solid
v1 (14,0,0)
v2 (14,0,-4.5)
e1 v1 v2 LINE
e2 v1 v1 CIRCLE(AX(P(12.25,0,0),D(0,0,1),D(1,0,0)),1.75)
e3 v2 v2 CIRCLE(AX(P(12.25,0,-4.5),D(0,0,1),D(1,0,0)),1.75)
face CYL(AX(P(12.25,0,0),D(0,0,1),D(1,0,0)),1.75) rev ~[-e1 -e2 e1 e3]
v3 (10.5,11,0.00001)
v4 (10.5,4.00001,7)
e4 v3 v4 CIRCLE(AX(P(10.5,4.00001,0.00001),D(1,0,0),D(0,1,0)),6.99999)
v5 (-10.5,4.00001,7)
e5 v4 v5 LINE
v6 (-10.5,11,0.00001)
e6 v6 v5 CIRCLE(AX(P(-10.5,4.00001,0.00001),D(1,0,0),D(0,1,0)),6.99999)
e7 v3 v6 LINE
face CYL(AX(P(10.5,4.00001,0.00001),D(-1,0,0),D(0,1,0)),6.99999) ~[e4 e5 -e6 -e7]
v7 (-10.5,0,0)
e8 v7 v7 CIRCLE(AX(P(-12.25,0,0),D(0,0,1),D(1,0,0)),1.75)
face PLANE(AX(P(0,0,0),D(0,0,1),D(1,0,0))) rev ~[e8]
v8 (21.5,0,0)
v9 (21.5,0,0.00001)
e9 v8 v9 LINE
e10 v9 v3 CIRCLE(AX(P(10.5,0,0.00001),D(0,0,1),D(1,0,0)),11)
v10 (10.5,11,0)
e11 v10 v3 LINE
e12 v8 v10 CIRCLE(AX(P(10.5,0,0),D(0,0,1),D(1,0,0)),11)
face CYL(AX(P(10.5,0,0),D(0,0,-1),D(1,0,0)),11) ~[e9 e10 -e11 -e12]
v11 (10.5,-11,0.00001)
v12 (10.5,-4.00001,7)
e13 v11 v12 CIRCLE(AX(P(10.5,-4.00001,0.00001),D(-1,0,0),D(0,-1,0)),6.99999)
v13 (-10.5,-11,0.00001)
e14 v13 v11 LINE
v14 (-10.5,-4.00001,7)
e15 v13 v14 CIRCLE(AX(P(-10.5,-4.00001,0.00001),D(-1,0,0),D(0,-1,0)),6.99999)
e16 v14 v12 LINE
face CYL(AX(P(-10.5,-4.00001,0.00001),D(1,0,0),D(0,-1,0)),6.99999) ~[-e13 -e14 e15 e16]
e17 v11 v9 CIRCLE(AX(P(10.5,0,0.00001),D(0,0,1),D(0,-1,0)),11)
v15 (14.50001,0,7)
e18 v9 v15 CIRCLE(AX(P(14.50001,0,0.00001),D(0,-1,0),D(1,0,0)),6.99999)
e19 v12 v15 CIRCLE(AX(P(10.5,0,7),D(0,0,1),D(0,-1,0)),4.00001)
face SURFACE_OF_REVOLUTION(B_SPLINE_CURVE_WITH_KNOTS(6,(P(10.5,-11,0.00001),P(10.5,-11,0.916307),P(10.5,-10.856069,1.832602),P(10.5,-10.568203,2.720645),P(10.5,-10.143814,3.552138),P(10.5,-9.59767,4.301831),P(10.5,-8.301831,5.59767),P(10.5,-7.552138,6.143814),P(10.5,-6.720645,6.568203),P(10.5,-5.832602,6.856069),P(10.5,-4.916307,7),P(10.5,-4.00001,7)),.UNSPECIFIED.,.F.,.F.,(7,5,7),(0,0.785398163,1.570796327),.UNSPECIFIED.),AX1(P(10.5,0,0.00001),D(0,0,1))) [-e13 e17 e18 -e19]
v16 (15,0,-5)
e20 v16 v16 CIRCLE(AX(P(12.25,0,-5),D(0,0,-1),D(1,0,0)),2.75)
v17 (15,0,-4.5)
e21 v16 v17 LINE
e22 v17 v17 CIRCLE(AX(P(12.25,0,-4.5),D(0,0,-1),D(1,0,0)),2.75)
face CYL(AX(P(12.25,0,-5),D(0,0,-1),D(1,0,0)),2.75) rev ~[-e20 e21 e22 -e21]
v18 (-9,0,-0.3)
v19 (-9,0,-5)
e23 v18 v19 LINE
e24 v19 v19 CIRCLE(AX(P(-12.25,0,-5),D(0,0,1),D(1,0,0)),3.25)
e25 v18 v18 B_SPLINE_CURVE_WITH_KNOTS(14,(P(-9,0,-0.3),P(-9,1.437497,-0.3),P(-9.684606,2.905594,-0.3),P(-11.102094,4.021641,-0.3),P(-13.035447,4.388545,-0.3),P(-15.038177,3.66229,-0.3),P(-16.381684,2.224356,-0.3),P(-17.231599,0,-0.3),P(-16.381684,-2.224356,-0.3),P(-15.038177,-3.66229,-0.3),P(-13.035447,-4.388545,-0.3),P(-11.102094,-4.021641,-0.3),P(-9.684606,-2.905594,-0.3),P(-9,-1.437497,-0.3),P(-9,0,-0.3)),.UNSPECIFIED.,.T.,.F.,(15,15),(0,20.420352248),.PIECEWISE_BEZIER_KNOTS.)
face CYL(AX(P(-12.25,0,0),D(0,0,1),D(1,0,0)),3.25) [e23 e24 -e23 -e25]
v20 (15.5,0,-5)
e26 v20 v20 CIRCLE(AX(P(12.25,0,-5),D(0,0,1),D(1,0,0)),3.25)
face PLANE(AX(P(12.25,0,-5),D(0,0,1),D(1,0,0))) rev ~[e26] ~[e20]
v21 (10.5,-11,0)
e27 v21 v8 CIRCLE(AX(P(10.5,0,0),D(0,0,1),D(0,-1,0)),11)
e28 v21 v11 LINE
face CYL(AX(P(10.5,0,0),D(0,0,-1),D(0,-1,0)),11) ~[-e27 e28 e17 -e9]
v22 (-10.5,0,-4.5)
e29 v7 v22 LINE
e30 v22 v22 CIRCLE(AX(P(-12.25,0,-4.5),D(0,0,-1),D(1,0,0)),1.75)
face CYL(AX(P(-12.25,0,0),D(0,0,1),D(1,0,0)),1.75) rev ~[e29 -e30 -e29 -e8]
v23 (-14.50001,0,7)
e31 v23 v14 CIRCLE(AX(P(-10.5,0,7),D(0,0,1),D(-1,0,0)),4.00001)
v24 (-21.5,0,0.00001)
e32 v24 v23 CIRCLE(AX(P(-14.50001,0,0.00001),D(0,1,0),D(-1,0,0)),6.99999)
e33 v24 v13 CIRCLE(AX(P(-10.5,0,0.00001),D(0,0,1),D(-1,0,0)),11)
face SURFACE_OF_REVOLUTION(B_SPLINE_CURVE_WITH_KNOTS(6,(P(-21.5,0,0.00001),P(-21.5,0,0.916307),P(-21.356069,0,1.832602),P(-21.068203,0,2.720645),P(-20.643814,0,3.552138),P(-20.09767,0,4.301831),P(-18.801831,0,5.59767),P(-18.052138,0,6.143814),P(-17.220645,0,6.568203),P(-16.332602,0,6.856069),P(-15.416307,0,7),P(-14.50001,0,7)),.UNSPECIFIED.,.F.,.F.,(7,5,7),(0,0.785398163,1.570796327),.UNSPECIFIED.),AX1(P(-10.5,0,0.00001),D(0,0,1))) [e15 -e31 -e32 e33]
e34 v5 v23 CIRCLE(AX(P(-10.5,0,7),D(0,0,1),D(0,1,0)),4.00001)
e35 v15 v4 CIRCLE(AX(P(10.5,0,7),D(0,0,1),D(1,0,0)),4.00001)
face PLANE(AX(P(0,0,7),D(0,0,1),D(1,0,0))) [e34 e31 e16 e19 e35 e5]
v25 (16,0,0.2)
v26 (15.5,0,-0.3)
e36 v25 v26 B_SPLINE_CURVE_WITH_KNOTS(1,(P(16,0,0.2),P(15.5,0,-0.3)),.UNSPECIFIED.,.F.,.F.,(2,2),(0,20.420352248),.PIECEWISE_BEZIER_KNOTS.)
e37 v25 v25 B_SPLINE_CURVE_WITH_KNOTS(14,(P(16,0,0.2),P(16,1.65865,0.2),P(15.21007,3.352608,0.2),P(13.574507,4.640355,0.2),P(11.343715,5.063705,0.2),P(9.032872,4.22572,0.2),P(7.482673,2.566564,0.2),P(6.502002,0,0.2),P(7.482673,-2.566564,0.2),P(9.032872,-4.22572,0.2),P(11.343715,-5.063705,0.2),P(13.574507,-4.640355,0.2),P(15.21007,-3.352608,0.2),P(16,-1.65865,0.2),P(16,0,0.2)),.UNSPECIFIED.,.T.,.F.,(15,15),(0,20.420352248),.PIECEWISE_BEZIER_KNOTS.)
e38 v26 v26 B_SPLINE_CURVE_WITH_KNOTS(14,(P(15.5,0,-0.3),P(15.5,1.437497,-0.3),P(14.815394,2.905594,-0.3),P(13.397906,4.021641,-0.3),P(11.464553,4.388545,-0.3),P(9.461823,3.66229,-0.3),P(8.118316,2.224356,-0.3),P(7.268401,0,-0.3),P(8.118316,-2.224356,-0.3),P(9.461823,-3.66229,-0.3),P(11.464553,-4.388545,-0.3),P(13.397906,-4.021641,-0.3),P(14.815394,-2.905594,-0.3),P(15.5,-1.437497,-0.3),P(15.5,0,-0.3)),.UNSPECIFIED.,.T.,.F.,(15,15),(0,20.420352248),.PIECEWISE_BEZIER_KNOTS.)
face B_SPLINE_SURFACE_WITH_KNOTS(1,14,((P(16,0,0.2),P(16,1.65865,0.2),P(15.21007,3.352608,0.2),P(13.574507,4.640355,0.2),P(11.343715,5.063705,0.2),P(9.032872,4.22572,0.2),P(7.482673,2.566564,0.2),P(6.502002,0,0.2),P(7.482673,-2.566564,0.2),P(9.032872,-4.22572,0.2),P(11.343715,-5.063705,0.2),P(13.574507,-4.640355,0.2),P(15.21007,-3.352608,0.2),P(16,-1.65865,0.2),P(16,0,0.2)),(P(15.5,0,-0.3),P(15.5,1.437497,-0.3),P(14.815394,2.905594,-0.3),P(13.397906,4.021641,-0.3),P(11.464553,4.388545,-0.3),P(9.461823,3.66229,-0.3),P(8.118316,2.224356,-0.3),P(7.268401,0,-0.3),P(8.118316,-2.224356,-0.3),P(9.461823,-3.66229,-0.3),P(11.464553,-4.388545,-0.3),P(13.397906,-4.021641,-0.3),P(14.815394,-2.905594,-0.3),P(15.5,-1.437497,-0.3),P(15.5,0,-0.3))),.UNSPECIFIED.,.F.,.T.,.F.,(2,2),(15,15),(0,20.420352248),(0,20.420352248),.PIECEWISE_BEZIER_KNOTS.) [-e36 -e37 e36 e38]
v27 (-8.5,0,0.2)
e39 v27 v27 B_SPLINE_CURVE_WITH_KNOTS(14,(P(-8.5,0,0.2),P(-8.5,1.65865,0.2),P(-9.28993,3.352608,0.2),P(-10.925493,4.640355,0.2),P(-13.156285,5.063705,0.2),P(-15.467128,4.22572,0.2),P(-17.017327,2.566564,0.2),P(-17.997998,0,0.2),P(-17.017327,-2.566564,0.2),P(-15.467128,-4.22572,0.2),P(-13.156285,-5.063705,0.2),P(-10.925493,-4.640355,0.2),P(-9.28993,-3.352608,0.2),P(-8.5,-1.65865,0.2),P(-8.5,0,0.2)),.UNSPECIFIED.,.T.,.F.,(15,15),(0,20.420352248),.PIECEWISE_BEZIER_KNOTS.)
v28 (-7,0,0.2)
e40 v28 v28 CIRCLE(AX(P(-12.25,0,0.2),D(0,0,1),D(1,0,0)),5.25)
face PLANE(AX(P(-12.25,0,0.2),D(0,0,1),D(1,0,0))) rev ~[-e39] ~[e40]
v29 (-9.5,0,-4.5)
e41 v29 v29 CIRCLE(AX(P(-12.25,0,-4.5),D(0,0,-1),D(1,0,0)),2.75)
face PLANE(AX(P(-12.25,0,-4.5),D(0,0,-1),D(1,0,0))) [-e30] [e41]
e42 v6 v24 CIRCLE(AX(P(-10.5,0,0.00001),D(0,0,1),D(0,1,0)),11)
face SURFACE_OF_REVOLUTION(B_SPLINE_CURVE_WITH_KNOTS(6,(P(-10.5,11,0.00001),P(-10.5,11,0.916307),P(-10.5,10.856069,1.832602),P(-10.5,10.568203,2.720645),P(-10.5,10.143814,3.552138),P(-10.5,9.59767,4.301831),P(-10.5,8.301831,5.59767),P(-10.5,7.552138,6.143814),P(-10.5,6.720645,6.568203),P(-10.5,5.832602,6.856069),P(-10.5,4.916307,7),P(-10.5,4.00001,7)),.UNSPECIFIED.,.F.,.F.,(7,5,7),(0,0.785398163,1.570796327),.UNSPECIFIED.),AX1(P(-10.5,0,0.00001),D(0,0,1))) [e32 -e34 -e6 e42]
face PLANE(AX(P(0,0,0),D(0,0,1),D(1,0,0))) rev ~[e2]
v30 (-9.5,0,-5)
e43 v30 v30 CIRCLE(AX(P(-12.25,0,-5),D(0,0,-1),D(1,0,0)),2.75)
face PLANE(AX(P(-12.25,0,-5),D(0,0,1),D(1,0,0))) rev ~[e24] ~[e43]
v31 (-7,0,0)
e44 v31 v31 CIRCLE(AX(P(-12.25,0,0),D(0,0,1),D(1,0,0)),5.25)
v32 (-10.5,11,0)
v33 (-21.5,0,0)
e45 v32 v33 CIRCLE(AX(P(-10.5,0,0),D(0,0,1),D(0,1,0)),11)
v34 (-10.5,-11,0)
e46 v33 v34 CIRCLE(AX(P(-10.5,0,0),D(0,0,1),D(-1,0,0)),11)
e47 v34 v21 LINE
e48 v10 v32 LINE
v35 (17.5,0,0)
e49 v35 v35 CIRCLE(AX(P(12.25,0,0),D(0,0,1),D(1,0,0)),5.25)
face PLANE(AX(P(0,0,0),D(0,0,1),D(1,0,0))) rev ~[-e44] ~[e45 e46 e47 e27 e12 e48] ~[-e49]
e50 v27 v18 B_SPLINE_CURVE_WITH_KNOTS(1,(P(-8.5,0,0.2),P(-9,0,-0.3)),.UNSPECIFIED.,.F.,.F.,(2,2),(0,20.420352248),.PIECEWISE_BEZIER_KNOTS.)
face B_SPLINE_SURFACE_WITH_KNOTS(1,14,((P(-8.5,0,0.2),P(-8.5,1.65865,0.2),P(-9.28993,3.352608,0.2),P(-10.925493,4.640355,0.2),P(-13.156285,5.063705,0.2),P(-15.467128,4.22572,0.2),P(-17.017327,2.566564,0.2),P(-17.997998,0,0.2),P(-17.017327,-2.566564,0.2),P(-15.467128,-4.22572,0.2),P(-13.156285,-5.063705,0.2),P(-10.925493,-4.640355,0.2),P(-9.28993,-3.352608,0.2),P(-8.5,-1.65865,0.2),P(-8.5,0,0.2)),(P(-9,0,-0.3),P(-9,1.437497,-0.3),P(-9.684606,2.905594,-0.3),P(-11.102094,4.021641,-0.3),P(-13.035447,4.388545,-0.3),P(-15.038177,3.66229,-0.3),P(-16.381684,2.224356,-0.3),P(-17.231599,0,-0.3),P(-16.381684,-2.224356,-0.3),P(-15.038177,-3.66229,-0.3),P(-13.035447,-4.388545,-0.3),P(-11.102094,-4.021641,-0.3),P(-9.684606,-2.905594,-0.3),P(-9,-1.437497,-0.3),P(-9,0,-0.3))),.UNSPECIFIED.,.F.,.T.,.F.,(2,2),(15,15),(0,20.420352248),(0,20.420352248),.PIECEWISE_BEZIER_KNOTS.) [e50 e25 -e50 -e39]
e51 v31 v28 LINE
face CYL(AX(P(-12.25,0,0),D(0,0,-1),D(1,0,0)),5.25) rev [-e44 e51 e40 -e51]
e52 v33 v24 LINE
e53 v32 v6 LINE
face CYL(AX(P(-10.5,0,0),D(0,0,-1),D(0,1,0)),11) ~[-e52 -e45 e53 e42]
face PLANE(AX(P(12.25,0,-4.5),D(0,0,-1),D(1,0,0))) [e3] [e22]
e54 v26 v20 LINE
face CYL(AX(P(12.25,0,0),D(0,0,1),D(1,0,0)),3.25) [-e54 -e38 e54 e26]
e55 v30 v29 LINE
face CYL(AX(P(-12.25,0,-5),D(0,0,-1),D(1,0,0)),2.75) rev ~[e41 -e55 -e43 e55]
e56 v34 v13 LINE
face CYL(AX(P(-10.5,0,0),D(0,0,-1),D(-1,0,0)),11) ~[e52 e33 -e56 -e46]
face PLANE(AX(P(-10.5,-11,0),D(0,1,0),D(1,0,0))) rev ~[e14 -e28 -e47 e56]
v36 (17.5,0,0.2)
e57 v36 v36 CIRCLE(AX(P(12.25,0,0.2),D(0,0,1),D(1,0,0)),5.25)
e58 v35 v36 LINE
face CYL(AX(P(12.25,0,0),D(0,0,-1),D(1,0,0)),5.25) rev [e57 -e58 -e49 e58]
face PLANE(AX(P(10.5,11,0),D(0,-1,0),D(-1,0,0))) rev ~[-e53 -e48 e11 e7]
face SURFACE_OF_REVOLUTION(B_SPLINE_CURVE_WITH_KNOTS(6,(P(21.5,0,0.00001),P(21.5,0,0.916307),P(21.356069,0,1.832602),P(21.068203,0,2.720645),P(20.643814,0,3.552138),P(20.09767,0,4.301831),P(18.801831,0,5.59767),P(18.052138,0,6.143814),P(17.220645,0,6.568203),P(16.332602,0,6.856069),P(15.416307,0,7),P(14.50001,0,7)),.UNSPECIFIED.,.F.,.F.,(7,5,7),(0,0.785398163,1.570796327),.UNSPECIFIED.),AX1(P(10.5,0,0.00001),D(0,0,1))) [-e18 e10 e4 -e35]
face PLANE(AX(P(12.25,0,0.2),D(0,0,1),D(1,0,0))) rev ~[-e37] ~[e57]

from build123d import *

# Parameters (mm, degrees)
F0_R     = 5.25
F0_R_2   = 3.25
F0_R_3   = 1.75
F1_DEPTH = 7
F2_R     = 6.99999
F3_DEPTH = 5
F4_DEPTH = 0.2
F5_SIZE  = 0.5
F6_R     = 2.75
F6_R_2   = 1.75
F7_DEPTH = 0.5


# Not quite as in the source:
# - a fillet or chamfer is up to 0.001 mm smaller than in the source, because OpenCascade refuses the exact size
# - a feature names something its author has since deleted; it is built from what else it names


with BuildPart() as f1:
    # F0 (on Top) → F1 (new body)
    with BuildSketch(Plane.XY):
        with BuildLine():
            Line((10.5, 11), (-10.5, 11))
            ThreePointArc((-10.5, 11), (-18.2781745931, 7.7781745931), (-21.5, 0))
            ThreePointArc((-21.5, 0), (-18.2781745931, -7.7781745931), (-10.5, -11))
            Line((-10.5, -11), (10.5, -11))
            ThreePointArc((10.5, -11), (18.2781745931, -7.7781745931), (21.5, 0))
            ThreePointArc((21.5, 0), (18.2781745931, 7.7781745931), (10.5, 11))
        make_face()
        with Locations((-12.25, 0)):
            Circle(F0_R, mode=Mode.SUBTRACT)
        with Locations((12.25, 0)):
            Circle(F0_R, mode=Mode.SUBTRACT)
        with Locations((-12.25, 0)):
            Circle(F0_R)
        with Locations((-12.25, 0)):
            Circle(F0_R_2, mode=Mode.SUBTRACT)
        with Locations((12.25, 0)):
            Circle(F0_R)
        with Locations((12.25, 0)):
            Circle(F0_R_2, mode=Mode.SUBTRACT)
        with Locations((12.25, 0)):
            Circle(F0_R_2)
        with Locations((12.25, 0)):
            Circle(F0_R_3, mode=Mode.SUBTRACT)
        with Locations((-12.25, 0)):
            Circle(F0_R_2)
        with Locations((-12.25, 0)):
            Circle(F0_R_3, mode=Mode.SUBTRACT)
        with Locations((-12.25, 0)):
            Circle(F0_R_3)
        with Locations((12.25, 0)):
            Circle(F0_R_3)
    extrude(amount=F1_DEPTH)

    # F2 (radius 7 in the source; OpenCascade refuses exactly that, so slightly less here)
    f2_edges = [f1.edges().sort_by_distance(p)[0] for p in [
        (0, 11, 7),
    ]]
    fillet(f2_edges, radius=F2_R)

    # F0 (on Top) → F3 (join)
    with BuildSketch(Plane.XY):
        with Locations((12.25, 0)):
            Circle(F0_R_2)
        with Locations((12.25, 0)):
            Circle(F0_R_3, mode=Mode.SUBTRACT)
        with Locations((-12.25, 0)):
            Circle(F0_R_2)
        with Locations((-12.25, 0)):
            Circle(F0_R_3, mode=Mode.SUBTRACT)
    extrude(amount=-F3_DEPTH)

    # F0 (on Top) → F4 (cut)
    with BuildSketch(Plane.XY):
        with Locations((-12.25, 0)):
            Circle(F0_R)
        with Locations((-12.25, 0)):
            Circle(F0_R_2, mode=Mode.SUBTRACT)
        with Locations((12.25, 0)):
            Circle(F0_R)
        with Locations((12.25, 0)):
            Circle(F0_R_2, mode=Mode.SUBTRACT)
    extrude(amount=F4_DEPTH, mode=Mode.SUBTRACT)

    # F5
    f5_edges = [f1.edges().sort_by_distance(p)[0] for p in [
        (-15.5, 0, 0.2),
        (9, 0, 0.2),
    ]]
    chamfer(f5_edges, length=F5_SIZE)

    # F6 (on face) → F7 (cut)
    with BuildSketch(Plane(origin=(0, 0, -5), x_dir=(1, 0, 0), z_dir=(0, 0, -1))):
        with Locations((-12.25, 0)):
            Circle(F6_R)
        with Locations((-12.25, 0)):
            Circle(F6_R_2, mode=Mode.SUBTRACT)
        with Locations((12.25, 0)):
            Circle(F6_R)
    extrude(amount=-F7_DEPTH, mode=Mode.SUBTRACT)


solid = f1.part
